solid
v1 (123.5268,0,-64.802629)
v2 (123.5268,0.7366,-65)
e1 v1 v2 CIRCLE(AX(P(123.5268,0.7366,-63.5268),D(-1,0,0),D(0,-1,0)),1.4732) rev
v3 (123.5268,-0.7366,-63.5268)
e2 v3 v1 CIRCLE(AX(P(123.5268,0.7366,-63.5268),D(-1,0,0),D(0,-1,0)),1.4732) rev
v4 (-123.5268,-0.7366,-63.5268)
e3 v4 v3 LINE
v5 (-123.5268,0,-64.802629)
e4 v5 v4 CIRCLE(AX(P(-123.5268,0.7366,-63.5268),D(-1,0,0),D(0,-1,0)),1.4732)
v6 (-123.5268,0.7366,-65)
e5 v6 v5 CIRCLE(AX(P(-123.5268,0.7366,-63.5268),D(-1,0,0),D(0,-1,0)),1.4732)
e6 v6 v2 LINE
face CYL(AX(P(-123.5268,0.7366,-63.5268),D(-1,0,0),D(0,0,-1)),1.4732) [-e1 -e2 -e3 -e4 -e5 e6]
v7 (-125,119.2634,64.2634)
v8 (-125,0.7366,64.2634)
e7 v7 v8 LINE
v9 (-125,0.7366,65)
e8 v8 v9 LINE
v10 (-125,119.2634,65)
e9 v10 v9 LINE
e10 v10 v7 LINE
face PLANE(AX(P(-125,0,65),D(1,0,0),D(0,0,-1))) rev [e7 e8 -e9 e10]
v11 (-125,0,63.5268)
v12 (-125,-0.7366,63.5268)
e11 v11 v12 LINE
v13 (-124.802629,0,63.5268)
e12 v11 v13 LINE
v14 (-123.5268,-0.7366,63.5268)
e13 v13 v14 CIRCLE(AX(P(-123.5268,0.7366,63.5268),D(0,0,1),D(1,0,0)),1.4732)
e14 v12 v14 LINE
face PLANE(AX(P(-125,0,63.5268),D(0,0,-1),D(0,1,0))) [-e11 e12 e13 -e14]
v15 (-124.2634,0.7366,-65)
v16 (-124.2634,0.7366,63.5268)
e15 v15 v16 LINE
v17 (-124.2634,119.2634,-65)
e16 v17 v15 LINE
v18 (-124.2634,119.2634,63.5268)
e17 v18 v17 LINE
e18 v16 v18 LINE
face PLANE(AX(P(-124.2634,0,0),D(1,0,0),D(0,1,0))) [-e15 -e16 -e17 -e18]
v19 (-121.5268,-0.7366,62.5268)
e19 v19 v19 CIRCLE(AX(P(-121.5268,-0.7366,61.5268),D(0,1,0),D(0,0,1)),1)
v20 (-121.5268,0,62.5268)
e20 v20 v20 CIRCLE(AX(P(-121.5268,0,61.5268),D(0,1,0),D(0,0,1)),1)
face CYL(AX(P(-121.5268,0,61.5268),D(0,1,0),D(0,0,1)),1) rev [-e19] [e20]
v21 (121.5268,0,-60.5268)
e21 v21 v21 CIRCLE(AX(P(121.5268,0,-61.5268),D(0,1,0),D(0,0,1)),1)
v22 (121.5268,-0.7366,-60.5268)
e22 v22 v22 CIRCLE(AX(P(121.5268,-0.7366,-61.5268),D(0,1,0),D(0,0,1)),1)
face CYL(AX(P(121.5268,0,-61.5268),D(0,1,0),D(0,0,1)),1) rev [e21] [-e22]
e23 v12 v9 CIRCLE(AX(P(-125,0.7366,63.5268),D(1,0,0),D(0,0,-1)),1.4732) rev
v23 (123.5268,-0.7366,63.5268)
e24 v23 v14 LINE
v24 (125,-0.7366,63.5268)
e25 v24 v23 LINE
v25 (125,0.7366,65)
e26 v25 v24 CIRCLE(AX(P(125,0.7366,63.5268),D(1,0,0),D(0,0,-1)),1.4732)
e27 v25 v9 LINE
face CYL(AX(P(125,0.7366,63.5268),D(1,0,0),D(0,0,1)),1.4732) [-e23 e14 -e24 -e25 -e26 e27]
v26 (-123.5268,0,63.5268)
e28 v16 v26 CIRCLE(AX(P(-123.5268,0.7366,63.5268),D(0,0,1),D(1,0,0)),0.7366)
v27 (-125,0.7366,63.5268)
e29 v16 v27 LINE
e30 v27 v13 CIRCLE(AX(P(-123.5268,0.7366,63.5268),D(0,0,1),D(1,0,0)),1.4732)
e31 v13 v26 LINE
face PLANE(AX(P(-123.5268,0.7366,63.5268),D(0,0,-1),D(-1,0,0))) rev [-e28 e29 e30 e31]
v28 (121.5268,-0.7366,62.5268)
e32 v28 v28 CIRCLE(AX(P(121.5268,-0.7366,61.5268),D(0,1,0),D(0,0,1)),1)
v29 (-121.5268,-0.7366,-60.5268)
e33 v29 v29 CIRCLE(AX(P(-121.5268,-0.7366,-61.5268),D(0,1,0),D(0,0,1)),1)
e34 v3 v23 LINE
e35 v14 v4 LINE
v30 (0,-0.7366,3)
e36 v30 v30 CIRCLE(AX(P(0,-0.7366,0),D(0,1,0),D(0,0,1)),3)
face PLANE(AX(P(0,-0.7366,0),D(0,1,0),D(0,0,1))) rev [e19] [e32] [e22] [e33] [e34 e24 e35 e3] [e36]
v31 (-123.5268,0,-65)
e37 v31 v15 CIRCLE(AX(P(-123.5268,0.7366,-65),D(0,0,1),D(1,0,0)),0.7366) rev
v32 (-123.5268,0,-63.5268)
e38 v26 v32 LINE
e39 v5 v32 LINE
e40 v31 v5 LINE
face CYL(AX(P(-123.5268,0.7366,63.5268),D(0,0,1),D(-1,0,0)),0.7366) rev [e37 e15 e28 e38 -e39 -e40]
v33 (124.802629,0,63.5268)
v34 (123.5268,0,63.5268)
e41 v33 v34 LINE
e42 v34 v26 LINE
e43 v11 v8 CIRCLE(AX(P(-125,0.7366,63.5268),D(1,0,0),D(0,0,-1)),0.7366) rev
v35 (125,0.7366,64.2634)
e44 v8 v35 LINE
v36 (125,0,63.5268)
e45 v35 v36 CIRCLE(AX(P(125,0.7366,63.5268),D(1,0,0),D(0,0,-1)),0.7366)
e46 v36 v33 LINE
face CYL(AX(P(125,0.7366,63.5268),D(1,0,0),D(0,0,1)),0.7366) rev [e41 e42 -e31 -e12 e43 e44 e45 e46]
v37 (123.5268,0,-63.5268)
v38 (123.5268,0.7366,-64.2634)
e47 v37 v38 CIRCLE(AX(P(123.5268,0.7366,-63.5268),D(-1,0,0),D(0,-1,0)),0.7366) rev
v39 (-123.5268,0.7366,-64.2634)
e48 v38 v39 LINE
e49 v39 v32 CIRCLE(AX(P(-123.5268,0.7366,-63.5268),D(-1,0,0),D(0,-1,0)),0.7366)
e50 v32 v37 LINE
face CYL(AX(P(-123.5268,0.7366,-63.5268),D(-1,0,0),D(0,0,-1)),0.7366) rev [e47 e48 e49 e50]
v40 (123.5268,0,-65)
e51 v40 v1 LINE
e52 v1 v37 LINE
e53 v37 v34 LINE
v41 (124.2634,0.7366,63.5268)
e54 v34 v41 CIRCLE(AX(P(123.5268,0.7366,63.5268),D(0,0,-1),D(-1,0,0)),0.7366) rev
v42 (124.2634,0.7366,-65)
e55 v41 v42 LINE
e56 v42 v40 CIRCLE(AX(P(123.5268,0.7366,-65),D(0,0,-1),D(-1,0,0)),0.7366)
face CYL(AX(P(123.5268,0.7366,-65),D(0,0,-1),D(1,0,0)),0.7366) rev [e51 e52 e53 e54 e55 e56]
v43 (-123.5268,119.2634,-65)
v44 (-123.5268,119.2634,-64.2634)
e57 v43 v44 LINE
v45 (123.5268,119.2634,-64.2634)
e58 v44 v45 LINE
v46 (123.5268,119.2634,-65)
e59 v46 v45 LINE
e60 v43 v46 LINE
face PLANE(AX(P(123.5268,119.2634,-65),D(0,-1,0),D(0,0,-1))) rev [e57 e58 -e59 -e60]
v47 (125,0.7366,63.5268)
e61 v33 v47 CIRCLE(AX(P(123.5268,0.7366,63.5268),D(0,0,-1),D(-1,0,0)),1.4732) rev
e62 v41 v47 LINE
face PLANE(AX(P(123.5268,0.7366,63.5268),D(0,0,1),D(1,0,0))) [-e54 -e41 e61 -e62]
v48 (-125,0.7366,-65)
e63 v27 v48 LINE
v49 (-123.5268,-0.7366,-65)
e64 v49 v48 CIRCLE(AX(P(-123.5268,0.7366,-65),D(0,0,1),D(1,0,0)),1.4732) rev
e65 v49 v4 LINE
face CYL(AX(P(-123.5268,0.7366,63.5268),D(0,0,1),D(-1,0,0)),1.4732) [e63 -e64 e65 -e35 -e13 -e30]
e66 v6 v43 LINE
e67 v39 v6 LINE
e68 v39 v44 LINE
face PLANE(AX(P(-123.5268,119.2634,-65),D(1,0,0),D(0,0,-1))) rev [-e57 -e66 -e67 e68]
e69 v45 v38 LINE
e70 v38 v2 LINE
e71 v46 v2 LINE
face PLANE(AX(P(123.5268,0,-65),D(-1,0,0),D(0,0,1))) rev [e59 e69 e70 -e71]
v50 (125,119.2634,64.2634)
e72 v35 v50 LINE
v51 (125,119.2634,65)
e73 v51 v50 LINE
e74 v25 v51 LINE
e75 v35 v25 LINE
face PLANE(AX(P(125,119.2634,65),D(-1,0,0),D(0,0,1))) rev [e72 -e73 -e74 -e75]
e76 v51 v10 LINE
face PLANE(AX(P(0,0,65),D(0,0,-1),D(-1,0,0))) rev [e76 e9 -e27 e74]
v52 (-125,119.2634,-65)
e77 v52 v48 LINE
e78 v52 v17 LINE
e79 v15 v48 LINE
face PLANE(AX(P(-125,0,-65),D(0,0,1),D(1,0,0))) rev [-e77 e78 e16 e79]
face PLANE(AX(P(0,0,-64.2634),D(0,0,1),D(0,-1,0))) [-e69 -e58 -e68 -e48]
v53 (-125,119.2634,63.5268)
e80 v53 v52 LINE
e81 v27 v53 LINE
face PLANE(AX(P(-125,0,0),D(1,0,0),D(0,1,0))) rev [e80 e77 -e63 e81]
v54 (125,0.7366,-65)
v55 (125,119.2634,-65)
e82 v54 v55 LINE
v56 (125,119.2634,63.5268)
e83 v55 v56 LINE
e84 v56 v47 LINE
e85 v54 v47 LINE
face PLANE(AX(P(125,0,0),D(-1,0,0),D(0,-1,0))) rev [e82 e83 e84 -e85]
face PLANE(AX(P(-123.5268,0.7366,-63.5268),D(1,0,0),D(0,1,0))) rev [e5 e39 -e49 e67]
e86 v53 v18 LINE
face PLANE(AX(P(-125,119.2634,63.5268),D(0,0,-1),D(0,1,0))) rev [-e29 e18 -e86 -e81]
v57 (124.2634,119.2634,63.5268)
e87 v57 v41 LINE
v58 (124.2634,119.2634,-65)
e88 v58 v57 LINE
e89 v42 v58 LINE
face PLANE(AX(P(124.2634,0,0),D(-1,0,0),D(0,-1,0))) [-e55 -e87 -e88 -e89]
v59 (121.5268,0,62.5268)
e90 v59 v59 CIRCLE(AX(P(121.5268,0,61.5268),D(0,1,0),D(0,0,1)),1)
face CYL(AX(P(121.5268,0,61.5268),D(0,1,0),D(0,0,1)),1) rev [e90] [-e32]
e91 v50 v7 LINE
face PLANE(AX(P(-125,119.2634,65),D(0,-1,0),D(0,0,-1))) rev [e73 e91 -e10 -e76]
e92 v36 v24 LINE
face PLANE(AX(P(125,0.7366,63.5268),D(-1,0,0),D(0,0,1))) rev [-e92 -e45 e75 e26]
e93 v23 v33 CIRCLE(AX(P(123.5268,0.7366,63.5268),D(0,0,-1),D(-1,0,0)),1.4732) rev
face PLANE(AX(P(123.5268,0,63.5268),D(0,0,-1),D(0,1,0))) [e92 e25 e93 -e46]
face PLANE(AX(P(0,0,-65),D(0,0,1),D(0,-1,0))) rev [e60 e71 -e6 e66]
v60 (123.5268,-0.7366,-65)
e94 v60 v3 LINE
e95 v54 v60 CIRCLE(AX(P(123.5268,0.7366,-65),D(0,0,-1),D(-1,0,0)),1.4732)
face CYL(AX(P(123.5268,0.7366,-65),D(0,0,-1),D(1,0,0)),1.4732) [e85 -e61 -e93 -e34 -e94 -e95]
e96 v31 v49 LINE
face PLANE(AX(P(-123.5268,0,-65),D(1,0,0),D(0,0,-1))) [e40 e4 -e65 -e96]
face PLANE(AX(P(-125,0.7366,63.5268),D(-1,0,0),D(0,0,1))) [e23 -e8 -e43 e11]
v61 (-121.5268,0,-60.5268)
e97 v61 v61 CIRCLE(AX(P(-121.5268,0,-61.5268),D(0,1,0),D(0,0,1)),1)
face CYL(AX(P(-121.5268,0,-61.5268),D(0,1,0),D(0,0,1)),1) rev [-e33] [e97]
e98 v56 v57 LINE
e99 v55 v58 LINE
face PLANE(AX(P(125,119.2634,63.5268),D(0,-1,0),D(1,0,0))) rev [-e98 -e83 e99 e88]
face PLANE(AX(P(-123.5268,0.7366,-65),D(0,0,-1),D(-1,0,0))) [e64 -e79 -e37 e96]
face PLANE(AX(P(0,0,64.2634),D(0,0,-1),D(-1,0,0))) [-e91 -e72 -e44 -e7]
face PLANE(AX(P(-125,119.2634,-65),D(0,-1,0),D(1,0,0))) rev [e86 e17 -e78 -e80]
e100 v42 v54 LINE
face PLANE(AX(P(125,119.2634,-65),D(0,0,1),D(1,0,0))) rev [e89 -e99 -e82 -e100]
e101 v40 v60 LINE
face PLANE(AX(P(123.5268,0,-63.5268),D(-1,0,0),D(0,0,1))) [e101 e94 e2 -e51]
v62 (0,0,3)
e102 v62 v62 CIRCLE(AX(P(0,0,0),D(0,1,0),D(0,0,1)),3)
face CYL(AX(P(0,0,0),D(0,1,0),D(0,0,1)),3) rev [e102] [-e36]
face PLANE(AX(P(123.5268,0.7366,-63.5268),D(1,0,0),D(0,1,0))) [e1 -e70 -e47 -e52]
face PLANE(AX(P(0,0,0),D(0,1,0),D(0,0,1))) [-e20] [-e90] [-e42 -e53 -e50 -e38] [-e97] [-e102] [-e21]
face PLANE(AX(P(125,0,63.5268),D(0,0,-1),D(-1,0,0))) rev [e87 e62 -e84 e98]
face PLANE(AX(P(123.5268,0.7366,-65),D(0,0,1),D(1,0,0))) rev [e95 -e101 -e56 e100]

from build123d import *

# Parameters (mm, degrees)
SKETCH1_W                    = 250
SKETCH1_H                    = 130
BASE_FLANGE1_DEPTH           = 0.7366
F_6_0_6_DIAMETER_HOLE1_D     = 6
EDGE_FLANGE1_STRIP_W         = 4.4196
EDGE_FLANGE1_STRIP_H         = 0.7366
EDGE_FLANGE1_STRIP_CUT_DEPTH = 250
EDGE_FLANGE1_DEPTH           = 250
EDGE_FLANGE2_STRIP_W         = 4.4196
EDGE_FLANGE2_STRIP_H         = 0.7366
EDGE_FLANGE2_STRIP_CUT_DEPTH = 128.5268
EDGE_FLANGE2_DEPTH           = 128.5268
EDGE_FLANGE3_STRIP_W         = 4.4196
EDGE_FLANGE3_STRIP_H         = 0.7366
EDGE_FLANGE3_STRIP_CUT_DEPTH = 128.5268
EDGE_FLANGE3_DEPTH           = 128.5268
EDGE_FLANGE4_STRIP_W         = 4.4196
EDGE_FLANGE4_STRIP_H         = 0.7366
EDGE_FLANGE4_STRIP_CUT_DEPTH = 247.0536
EDGE_FLANGE4_DEPTH           = 247.0536
F_2_0_2_DIAMETER_HOLE2_D     = 2
F_2_0_2_DIAMETER_HOLE3_D     = 2


# Sheet-metal steps are written as plain solids
with BuildPart() as part:
    # Sketch1 → Base-Flange1 (new body)
    with BuildSketch(Plane(origin=(0, 0, 0), x_dir=(1, 0, 0), z_dir=(0, 1, 0))):
        Rectangle(SKETCH1_W, SKETCH1_H)
    extrude(amount=-BASE_FLANGE1_DEPTH)

    # Ø6.0 (6) Diameter Hole1 (through all)
    with Locations(Plane(origin=(0, 0, 0), x_dir=(1, 0, 0), z_dir=(0, 1, 0))):
        with Locations((0, 0)):
            Hole(F_6_0_6_DIAMETER_HOLE1_D / 2)

    # Edge-Flange1 strip (across the edge) → Edge-Flange1 strip cut (cut)
    with BuildSketch(Plane(origin=(-125, 0, 65), x_dir=(0, 0, -1), z_dir=(1, 0, 0))):
        with Locations((-0.7366, -0.3683)):
            Rectangle(EDGE_FLANGE1_STRIP_W, EDGE_FLANGE1_STRIP_H)
    extrude(amount=EDGE_FLANGE1_STRIP_CUT_DEPTH, mode=Mode.SUBTRACT)

    # Edge-Flange1 section (across the edge) → Edge-Flange1 (add)
    with BuildSketch(Plane(origin=(-125, 0, 65), x_dir=(0, 0, -1), z_dir=(1, 0, 0))):
        with BuildLine():
            Line((0, 0.7366), (0, 119.2634))
            Line((0, 119.2634), (0.7366, 119.2634))
            Line((0.7366, 119.2634), (0.7366, 0.7366))
            ThreePointArc((0.7366, 0.7366), (0.952345145, 0.215745145), (1.4732, 0))
            Line((1.4732, 0), (1.4732, -0.7366))
            ThreePointArc((1.4732, -0.7366), (0.43149029, -0.30510971), (0, 0.7366))
        make_face()
    extrude(amount=EDGE_FLANGE1_DEPTH)

    # Edge-Flange2 strip (across the edge) → Edge-Flange2 strip cut (cut)
    with BuildSketch(Plane(origin=(125, 0, 63.5268), x_dir=(-1, 0, 0), z_dir=(0, 0, -1))):
        with Locations((-0.7366, -0.3683)):
            Rectangle(EDGE_FLANGE2_STRIP_W, EDGE_FLANGE2_STRIP_H)
    extrude(amount=EDGE_FLANGE2_STRIP_CUT_DEPTH, mode=Mode.SUBTRACT)

    # Edge-Flange2 section (across the edge) → Edge-Flange2 (add)
    with BuildSketch(Plane(origin=(125, 0, 63.5268), x_dir=(-1, 0, 0), z_dir=(0, 0, -1))):
        with BuildLine():
            Line((0, 0.7366), (0, 119.2634))
            Line((0, 119.2634), (0.7366, 119.2634))
            Line((0.7366, 119.2634), (0.7366, 0.7366))
            ThreePointArc((0.7366, 0.7366), (0.952345145, 0.215745145), (1.4732, 0))
            Line((1.4732, 0), (1.4732, -0.7366))
            ThreePointArc((1.4732, -0.7366), (0.43149029, -0.30510971), (0, 0.7366))
        make_face()
    extrude(amount=EDGE_FLANGE2_DEPTH)

    # Edge-Flange3 strip (across the edge) → Edge-Flange3 strip cut (cut)
    with BuildSketch(Plane(origin=(-125, 0, -65), x_dir=(1, 0, 0), z_dir=(0, 0, 1))):
        with Locations((-0.7366, -0.3683)):
            Rectangle(EDGE_FLANGE3_STRIP_W, EDGE_FLANGE3_STRIP_H)
    extrude(amount=EDGE_FLANGE3_STRIP_CUT_DEPTH, mode=Mode.SUBTRACT)

    # Edge-Flange3 section (across the edge) → Edge-Flange3 (add)
    with BuildSketch(Plane(origin=(-125, 0, -65), x_dir=(1, 0, 0), z_dir=(0, 0, 1))):
        with BuildLine():
            Line((0, 0.7366), (0, 119.2634))
            Line((0, 119.2634), (0.7366, 119.2634))
            Line((0.7366, 119.2634), (0.7366, 0.7366))
            ThreePointArc((0.7366, 0.7366), (0.952345145, 0.215745145), (1.4732, 0))
            Line((1.4732, 0), (1.4732, -0.7366))
            ThreePointArc((1.4732, -0.7366), (0.43149029, -0.30510971), (0, 0.7366))
        make_face()
    extrude(amount=EDGE_FLANGE3_DEPTH)

    # Edge-Flange4 strip (across the edge) → Edge-Flange4 strip cut (cut)
    with BuildSketch(Plane(origin=(123.5268, 0, -65), x_dir=(0, 0, 1), z_dir=(-1, 0, 0))):
        with Locations((-0.7366, -0.3683)):
            Rectangle(EDGE_FLANGE4_STRIP_W, EDGE_FLANGE4_STRIP_H)
    extrude(amount=EDGE_FLANGE4_STRIP_CUT_DEPTH, mode=Mode.SUBTRACT)

    # Edge-Flange4 section (across the edge) → Edge-Flange4 (add)
    with BuildSketch(Plane(origin=(123.5268, 0, -65), x_dir=(0, 0, 1), z_dir=(-1, 0, 0))):
        with BuildLine():
            Line((0, 0.7366), (0, 119.2634))
            Line((0, 119.2634), (0.7366, 119.2634))
            Line((0.7366, 119.2634), (0.7366, 0.7366))
            ThreePointArc((0.7366, 0.7366), (0.952345145, 0.215745145), (1.4732, 0))
            Line((1.4732, 0), (1.4732, -0.7366))
            ThreePointArc((1.4732, -0.7366), (0.43149029, -0.30510971), (0, 0.7366))
        make_face()
    extrude(amount=EDGE_FLANGE4_DEPTH)

    # Ø2.0 (2) Diameter Hole2 (through all)
    with Locations(Plane(origin=(0, 0, 0), x_dir=(1, 0, 0), z_dir=(0, 1, 0))):
        with Locations((-121.5268, 61.5268)):
            Hole(F_2_0_2_DIAMETER_HOLE2_D / 2)

    # Ø2.0 (2) Diameter Hole3 (through all)
    with Locations(Plane(origin=(0, 0, 0), x_dir=(1, 0, 0), z_dir=(0, 1, 0))):
        with Locations((-121.5268, -61.5268), (121.5268, 61.5268), (121.5268, -61.5268)):
            Hole(F_2_0_2_DIAMETER_HOLE3_D / 2)


solid = part.part
